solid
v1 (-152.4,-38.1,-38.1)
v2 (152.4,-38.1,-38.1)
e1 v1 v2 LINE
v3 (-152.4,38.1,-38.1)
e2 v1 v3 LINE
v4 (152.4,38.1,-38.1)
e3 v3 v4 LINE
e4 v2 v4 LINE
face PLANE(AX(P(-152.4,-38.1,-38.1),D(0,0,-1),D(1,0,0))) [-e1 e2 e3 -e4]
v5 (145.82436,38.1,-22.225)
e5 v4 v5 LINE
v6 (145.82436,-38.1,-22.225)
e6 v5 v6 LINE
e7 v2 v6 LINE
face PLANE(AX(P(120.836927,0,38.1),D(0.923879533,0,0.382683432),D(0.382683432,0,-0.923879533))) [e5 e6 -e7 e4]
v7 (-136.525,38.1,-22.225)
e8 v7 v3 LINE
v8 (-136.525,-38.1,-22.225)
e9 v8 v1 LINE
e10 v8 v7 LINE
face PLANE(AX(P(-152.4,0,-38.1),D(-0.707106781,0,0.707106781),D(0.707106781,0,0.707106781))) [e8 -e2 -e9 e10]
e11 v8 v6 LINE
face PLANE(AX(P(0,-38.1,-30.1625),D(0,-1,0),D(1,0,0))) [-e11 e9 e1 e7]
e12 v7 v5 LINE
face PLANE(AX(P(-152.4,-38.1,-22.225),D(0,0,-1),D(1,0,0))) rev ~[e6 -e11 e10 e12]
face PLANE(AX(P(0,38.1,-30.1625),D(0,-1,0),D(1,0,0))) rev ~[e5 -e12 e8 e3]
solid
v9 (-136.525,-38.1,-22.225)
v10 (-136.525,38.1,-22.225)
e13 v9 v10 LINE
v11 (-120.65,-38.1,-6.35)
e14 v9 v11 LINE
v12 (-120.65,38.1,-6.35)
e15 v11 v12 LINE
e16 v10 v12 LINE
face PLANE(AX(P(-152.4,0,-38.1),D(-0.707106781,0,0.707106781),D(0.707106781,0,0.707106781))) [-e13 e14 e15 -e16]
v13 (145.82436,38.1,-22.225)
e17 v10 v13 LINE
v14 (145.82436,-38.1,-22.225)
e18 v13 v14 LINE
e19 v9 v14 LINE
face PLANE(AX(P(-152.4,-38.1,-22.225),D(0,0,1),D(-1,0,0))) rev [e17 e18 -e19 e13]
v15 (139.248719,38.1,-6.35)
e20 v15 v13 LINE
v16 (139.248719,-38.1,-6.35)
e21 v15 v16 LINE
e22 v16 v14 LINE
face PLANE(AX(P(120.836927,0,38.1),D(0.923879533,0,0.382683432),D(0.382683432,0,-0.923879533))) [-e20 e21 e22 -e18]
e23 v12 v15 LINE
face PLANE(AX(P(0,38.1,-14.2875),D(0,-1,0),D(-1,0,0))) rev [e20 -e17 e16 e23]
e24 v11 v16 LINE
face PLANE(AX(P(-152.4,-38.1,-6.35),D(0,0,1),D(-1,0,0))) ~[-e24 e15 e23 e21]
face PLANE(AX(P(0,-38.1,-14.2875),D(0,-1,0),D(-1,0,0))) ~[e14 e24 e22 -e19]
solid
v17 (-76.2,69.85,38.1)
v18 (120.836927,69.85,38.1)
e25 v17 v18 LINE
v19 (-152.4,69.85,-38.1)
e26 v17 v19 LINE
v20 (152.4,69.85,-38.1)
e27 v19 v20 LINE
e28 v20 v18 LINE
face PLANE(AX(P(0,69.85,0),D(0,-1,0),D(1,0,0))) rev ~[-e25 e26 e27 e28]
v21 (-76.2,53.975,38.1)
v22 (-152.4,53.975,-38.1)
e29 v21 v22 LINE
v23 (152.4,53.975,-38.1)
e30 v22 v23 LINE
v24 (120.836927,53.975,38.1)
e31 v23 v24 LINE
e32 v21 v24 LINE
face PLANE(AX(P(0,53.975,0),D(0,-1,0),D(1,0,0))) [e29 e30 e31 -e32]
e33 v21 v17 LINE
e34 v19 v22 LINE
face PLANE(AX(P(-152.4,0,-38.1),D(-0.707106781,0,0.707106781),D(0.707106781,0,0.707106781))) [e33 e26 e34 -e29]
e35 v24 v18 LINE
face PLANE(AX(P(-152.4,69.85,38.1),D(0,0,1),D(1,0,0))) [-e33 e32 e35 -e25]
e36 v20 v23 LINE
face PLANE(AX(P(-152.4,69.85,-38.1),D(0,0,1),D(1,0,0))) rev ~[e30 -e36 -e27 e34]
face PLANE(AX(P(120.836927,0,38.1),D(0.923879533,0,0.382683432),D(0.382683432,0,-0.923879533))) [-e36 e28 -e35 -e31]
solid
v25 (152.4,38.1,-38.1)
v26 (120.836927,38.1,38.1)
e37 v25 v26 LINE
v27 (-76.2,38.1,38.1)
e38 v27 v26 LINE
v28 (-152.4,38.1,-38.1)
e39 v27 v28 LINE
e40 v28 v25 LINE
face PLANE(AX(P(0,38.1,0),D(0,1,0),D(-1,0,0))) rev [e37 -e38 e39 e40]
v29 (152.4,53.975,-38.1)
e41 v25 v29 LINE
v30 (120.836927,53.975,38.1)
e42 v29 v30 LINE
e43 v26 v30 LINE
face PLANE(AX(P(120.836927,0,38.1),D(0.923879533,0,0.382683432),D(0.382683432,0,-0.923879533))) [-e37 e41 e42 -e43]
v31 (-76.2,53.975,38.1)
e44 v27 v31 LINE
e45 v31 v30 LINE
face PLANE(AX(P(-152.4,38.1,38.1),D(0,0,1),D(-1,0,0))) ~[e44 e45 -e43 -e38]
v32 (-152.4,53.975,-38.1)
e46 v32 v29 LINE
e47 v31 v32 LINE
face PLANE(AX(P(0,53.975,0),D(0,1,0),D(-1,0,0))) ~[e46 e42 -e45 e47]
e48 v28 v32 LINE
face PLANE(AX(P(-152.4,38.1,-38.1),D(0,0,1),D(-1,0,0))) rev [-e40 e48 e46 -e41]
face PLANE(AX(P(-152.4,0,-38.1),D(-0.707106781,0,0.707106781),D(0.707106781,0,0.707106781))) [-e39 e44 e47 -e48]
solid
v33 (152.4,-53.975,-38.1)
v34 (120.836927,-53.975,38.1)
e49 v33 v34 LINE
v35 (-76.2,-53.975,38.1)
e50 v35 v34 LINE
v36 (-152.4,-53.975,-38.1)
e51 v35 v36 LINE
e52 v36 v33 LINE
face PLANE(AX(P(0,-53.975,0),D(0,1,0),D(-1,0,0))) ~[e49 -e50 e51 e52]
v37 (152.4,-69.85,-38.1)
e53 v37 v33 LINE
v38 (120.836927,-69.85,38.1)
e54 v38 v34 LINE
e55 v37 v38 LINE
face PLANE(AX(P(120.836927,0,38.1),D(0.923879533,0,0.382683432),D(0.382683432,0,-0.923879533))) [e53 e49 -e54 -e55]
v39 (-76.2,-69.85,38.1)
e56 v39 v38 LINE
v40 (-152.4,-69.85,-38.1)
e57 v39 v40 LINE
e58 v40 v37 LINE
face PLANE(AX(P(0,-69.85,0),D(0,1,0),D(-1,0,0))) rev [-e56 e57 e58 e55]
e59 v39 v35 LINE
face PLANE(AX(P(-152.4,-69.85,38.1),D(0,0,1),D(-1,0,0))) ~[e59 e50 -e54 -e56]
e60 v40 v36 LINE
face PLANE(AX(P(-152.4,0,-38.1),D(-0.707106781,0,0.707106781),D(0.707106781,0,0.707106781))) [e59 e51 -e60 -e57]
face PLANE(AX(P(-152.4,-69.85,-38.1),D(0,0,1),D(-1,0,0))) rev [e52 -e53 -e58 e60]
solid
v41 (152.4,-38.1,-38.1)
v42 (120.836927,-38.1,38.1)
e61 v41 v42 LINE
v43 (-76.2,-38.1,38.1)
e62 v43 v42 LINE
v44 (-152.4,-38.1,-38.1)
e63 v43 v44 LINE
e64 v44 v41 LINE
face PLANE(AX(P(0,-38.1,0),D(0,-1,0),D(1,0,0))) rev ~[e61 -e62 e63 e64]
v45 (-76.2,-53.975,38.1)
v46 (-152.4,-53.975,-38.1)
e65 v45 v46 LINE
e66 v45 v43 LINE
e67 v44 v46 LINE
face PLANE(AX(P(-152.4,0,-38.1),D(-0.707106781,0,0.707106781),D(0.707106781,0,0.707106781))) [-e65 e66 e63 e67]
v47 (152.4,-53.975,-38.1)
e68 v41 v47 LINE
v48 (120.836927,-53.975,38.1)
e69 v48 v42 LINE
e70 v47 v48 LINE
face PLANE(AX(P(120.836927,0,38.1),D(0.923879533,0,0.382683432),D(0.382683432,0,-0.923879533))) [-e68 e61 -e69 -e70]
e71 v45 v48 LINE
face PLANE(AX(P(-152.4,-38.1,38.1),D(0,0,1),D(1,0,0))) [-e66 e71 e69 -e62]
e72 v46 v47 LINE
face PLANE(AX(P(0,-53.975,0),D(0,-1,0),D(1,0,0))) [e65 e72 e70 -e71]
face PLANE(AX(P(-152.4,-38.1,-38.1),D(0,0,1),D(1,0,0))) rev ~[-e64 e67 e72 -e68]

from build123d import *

# Parameters (mm, degrees)
F1_W          = 304.8
F1_H          = 76.2
F2_DEPTH      = 15.875
F5_W          = 304.8
F5_H          = 15.875
F6_DEPTH      = 76.2
F9_DEPTH      = 69.851
F9_DEPTH_BACK = 69.851


# Not quite as in the source:
# - a length typed as a fraction of an inch, garbled in the dataset ("3 / 203.2 mm" for 3/8 in), is restored


with BuildPart() as f2:
    # F1 (on offset) → F2 (new body)
    with BuildSketch(Plane.XZ.offset(38.1)):
        Rectangle(F1_W, F1_H)
    extrude(amount=F2_DEPTH)


with BuildPart() as f3_1:
    # F3: instance of F2
    add(f2.part.mirror(Plane.XZ.offset(53.975)))


with BuildPart() as f4_1:
    # F4: instance of F2
    add(f2.part.mirror(Plane.XZ))


with BuildPart() as f4_2:
    # F4: instance of F3_1
    add(f3_1.part.mirror(Plane.XZ))


with BuildPart() as f6:
    # F5 (on offset) → F6 (new body, through all)
    with BuildSketch(Plane.XZ.offset(38.1)):
        with Locations((0, -30.1625)):
            Rectangle(F5_W, F5_H)
    extrude(amount=-F6_DEPTH)


with BuildPart() as f7_1:
    # F7: instance of F6
    add(f6.part.mirror(Plane.XY.offset(-22.225)))


with BuildPart() as f9_tool:
    # F8 (on Front) → F9 (new body, two sides)
    with BuildSketch(Plane.XZ) as f9_sk:
        Polygon((-152.4, 38.1), (-152.4, -38.1), (-76.2, 38.1), align=None)
        Polygon((120.8369265472, 38.1), (152.4, -38.1), (152.4, 38.1), align=None)
    extrude(amount=-F9_DEPTH)
    extrude(f9_sk.sketch, amount=F9_DEPTH_BACK)


with BuildPart() as f2_1:
    add(f2.part)

    # F9: cut by f9_tool
    add(f9_tool.part, mode=Mode.SUBTRACT)


with BuildPart() as f3_1_1:
    add(f3_1.part)

    # F9: cut by f9_tool
    add(f9_tool.part, mode=Mode.SUBTRACT)


with BuildPart() as f4_1_1:
    add(f4_1.part)

    # F9: cut by f9_tool
    add(f9_tool.part, mode=Mode.SUBTRACT)


with BuildPart() as f4_2_1:
    add(f4_2.part)

    # F9: cut by f9_tool
    add(f9_tool.part, mode=Mode.SUBTRACT)


with BuildPart() as f6_1:
    add(f6.part)

    # F9: cut by f9_tool
    add(f9_tool.part, mode=Mode.SUBTRACT)


with BuildPart() as f7_1_1:
    add(f7_1.part)

    # F9: cut by f9_tool
    add(f9_tool.part, mode=Mode.SUBTRACT)


solid = Compound([f2_1.part, f3_1_1.part, f4_1_1.part, f4_2_1.part, f6_1.part, f7_1_1.part])
